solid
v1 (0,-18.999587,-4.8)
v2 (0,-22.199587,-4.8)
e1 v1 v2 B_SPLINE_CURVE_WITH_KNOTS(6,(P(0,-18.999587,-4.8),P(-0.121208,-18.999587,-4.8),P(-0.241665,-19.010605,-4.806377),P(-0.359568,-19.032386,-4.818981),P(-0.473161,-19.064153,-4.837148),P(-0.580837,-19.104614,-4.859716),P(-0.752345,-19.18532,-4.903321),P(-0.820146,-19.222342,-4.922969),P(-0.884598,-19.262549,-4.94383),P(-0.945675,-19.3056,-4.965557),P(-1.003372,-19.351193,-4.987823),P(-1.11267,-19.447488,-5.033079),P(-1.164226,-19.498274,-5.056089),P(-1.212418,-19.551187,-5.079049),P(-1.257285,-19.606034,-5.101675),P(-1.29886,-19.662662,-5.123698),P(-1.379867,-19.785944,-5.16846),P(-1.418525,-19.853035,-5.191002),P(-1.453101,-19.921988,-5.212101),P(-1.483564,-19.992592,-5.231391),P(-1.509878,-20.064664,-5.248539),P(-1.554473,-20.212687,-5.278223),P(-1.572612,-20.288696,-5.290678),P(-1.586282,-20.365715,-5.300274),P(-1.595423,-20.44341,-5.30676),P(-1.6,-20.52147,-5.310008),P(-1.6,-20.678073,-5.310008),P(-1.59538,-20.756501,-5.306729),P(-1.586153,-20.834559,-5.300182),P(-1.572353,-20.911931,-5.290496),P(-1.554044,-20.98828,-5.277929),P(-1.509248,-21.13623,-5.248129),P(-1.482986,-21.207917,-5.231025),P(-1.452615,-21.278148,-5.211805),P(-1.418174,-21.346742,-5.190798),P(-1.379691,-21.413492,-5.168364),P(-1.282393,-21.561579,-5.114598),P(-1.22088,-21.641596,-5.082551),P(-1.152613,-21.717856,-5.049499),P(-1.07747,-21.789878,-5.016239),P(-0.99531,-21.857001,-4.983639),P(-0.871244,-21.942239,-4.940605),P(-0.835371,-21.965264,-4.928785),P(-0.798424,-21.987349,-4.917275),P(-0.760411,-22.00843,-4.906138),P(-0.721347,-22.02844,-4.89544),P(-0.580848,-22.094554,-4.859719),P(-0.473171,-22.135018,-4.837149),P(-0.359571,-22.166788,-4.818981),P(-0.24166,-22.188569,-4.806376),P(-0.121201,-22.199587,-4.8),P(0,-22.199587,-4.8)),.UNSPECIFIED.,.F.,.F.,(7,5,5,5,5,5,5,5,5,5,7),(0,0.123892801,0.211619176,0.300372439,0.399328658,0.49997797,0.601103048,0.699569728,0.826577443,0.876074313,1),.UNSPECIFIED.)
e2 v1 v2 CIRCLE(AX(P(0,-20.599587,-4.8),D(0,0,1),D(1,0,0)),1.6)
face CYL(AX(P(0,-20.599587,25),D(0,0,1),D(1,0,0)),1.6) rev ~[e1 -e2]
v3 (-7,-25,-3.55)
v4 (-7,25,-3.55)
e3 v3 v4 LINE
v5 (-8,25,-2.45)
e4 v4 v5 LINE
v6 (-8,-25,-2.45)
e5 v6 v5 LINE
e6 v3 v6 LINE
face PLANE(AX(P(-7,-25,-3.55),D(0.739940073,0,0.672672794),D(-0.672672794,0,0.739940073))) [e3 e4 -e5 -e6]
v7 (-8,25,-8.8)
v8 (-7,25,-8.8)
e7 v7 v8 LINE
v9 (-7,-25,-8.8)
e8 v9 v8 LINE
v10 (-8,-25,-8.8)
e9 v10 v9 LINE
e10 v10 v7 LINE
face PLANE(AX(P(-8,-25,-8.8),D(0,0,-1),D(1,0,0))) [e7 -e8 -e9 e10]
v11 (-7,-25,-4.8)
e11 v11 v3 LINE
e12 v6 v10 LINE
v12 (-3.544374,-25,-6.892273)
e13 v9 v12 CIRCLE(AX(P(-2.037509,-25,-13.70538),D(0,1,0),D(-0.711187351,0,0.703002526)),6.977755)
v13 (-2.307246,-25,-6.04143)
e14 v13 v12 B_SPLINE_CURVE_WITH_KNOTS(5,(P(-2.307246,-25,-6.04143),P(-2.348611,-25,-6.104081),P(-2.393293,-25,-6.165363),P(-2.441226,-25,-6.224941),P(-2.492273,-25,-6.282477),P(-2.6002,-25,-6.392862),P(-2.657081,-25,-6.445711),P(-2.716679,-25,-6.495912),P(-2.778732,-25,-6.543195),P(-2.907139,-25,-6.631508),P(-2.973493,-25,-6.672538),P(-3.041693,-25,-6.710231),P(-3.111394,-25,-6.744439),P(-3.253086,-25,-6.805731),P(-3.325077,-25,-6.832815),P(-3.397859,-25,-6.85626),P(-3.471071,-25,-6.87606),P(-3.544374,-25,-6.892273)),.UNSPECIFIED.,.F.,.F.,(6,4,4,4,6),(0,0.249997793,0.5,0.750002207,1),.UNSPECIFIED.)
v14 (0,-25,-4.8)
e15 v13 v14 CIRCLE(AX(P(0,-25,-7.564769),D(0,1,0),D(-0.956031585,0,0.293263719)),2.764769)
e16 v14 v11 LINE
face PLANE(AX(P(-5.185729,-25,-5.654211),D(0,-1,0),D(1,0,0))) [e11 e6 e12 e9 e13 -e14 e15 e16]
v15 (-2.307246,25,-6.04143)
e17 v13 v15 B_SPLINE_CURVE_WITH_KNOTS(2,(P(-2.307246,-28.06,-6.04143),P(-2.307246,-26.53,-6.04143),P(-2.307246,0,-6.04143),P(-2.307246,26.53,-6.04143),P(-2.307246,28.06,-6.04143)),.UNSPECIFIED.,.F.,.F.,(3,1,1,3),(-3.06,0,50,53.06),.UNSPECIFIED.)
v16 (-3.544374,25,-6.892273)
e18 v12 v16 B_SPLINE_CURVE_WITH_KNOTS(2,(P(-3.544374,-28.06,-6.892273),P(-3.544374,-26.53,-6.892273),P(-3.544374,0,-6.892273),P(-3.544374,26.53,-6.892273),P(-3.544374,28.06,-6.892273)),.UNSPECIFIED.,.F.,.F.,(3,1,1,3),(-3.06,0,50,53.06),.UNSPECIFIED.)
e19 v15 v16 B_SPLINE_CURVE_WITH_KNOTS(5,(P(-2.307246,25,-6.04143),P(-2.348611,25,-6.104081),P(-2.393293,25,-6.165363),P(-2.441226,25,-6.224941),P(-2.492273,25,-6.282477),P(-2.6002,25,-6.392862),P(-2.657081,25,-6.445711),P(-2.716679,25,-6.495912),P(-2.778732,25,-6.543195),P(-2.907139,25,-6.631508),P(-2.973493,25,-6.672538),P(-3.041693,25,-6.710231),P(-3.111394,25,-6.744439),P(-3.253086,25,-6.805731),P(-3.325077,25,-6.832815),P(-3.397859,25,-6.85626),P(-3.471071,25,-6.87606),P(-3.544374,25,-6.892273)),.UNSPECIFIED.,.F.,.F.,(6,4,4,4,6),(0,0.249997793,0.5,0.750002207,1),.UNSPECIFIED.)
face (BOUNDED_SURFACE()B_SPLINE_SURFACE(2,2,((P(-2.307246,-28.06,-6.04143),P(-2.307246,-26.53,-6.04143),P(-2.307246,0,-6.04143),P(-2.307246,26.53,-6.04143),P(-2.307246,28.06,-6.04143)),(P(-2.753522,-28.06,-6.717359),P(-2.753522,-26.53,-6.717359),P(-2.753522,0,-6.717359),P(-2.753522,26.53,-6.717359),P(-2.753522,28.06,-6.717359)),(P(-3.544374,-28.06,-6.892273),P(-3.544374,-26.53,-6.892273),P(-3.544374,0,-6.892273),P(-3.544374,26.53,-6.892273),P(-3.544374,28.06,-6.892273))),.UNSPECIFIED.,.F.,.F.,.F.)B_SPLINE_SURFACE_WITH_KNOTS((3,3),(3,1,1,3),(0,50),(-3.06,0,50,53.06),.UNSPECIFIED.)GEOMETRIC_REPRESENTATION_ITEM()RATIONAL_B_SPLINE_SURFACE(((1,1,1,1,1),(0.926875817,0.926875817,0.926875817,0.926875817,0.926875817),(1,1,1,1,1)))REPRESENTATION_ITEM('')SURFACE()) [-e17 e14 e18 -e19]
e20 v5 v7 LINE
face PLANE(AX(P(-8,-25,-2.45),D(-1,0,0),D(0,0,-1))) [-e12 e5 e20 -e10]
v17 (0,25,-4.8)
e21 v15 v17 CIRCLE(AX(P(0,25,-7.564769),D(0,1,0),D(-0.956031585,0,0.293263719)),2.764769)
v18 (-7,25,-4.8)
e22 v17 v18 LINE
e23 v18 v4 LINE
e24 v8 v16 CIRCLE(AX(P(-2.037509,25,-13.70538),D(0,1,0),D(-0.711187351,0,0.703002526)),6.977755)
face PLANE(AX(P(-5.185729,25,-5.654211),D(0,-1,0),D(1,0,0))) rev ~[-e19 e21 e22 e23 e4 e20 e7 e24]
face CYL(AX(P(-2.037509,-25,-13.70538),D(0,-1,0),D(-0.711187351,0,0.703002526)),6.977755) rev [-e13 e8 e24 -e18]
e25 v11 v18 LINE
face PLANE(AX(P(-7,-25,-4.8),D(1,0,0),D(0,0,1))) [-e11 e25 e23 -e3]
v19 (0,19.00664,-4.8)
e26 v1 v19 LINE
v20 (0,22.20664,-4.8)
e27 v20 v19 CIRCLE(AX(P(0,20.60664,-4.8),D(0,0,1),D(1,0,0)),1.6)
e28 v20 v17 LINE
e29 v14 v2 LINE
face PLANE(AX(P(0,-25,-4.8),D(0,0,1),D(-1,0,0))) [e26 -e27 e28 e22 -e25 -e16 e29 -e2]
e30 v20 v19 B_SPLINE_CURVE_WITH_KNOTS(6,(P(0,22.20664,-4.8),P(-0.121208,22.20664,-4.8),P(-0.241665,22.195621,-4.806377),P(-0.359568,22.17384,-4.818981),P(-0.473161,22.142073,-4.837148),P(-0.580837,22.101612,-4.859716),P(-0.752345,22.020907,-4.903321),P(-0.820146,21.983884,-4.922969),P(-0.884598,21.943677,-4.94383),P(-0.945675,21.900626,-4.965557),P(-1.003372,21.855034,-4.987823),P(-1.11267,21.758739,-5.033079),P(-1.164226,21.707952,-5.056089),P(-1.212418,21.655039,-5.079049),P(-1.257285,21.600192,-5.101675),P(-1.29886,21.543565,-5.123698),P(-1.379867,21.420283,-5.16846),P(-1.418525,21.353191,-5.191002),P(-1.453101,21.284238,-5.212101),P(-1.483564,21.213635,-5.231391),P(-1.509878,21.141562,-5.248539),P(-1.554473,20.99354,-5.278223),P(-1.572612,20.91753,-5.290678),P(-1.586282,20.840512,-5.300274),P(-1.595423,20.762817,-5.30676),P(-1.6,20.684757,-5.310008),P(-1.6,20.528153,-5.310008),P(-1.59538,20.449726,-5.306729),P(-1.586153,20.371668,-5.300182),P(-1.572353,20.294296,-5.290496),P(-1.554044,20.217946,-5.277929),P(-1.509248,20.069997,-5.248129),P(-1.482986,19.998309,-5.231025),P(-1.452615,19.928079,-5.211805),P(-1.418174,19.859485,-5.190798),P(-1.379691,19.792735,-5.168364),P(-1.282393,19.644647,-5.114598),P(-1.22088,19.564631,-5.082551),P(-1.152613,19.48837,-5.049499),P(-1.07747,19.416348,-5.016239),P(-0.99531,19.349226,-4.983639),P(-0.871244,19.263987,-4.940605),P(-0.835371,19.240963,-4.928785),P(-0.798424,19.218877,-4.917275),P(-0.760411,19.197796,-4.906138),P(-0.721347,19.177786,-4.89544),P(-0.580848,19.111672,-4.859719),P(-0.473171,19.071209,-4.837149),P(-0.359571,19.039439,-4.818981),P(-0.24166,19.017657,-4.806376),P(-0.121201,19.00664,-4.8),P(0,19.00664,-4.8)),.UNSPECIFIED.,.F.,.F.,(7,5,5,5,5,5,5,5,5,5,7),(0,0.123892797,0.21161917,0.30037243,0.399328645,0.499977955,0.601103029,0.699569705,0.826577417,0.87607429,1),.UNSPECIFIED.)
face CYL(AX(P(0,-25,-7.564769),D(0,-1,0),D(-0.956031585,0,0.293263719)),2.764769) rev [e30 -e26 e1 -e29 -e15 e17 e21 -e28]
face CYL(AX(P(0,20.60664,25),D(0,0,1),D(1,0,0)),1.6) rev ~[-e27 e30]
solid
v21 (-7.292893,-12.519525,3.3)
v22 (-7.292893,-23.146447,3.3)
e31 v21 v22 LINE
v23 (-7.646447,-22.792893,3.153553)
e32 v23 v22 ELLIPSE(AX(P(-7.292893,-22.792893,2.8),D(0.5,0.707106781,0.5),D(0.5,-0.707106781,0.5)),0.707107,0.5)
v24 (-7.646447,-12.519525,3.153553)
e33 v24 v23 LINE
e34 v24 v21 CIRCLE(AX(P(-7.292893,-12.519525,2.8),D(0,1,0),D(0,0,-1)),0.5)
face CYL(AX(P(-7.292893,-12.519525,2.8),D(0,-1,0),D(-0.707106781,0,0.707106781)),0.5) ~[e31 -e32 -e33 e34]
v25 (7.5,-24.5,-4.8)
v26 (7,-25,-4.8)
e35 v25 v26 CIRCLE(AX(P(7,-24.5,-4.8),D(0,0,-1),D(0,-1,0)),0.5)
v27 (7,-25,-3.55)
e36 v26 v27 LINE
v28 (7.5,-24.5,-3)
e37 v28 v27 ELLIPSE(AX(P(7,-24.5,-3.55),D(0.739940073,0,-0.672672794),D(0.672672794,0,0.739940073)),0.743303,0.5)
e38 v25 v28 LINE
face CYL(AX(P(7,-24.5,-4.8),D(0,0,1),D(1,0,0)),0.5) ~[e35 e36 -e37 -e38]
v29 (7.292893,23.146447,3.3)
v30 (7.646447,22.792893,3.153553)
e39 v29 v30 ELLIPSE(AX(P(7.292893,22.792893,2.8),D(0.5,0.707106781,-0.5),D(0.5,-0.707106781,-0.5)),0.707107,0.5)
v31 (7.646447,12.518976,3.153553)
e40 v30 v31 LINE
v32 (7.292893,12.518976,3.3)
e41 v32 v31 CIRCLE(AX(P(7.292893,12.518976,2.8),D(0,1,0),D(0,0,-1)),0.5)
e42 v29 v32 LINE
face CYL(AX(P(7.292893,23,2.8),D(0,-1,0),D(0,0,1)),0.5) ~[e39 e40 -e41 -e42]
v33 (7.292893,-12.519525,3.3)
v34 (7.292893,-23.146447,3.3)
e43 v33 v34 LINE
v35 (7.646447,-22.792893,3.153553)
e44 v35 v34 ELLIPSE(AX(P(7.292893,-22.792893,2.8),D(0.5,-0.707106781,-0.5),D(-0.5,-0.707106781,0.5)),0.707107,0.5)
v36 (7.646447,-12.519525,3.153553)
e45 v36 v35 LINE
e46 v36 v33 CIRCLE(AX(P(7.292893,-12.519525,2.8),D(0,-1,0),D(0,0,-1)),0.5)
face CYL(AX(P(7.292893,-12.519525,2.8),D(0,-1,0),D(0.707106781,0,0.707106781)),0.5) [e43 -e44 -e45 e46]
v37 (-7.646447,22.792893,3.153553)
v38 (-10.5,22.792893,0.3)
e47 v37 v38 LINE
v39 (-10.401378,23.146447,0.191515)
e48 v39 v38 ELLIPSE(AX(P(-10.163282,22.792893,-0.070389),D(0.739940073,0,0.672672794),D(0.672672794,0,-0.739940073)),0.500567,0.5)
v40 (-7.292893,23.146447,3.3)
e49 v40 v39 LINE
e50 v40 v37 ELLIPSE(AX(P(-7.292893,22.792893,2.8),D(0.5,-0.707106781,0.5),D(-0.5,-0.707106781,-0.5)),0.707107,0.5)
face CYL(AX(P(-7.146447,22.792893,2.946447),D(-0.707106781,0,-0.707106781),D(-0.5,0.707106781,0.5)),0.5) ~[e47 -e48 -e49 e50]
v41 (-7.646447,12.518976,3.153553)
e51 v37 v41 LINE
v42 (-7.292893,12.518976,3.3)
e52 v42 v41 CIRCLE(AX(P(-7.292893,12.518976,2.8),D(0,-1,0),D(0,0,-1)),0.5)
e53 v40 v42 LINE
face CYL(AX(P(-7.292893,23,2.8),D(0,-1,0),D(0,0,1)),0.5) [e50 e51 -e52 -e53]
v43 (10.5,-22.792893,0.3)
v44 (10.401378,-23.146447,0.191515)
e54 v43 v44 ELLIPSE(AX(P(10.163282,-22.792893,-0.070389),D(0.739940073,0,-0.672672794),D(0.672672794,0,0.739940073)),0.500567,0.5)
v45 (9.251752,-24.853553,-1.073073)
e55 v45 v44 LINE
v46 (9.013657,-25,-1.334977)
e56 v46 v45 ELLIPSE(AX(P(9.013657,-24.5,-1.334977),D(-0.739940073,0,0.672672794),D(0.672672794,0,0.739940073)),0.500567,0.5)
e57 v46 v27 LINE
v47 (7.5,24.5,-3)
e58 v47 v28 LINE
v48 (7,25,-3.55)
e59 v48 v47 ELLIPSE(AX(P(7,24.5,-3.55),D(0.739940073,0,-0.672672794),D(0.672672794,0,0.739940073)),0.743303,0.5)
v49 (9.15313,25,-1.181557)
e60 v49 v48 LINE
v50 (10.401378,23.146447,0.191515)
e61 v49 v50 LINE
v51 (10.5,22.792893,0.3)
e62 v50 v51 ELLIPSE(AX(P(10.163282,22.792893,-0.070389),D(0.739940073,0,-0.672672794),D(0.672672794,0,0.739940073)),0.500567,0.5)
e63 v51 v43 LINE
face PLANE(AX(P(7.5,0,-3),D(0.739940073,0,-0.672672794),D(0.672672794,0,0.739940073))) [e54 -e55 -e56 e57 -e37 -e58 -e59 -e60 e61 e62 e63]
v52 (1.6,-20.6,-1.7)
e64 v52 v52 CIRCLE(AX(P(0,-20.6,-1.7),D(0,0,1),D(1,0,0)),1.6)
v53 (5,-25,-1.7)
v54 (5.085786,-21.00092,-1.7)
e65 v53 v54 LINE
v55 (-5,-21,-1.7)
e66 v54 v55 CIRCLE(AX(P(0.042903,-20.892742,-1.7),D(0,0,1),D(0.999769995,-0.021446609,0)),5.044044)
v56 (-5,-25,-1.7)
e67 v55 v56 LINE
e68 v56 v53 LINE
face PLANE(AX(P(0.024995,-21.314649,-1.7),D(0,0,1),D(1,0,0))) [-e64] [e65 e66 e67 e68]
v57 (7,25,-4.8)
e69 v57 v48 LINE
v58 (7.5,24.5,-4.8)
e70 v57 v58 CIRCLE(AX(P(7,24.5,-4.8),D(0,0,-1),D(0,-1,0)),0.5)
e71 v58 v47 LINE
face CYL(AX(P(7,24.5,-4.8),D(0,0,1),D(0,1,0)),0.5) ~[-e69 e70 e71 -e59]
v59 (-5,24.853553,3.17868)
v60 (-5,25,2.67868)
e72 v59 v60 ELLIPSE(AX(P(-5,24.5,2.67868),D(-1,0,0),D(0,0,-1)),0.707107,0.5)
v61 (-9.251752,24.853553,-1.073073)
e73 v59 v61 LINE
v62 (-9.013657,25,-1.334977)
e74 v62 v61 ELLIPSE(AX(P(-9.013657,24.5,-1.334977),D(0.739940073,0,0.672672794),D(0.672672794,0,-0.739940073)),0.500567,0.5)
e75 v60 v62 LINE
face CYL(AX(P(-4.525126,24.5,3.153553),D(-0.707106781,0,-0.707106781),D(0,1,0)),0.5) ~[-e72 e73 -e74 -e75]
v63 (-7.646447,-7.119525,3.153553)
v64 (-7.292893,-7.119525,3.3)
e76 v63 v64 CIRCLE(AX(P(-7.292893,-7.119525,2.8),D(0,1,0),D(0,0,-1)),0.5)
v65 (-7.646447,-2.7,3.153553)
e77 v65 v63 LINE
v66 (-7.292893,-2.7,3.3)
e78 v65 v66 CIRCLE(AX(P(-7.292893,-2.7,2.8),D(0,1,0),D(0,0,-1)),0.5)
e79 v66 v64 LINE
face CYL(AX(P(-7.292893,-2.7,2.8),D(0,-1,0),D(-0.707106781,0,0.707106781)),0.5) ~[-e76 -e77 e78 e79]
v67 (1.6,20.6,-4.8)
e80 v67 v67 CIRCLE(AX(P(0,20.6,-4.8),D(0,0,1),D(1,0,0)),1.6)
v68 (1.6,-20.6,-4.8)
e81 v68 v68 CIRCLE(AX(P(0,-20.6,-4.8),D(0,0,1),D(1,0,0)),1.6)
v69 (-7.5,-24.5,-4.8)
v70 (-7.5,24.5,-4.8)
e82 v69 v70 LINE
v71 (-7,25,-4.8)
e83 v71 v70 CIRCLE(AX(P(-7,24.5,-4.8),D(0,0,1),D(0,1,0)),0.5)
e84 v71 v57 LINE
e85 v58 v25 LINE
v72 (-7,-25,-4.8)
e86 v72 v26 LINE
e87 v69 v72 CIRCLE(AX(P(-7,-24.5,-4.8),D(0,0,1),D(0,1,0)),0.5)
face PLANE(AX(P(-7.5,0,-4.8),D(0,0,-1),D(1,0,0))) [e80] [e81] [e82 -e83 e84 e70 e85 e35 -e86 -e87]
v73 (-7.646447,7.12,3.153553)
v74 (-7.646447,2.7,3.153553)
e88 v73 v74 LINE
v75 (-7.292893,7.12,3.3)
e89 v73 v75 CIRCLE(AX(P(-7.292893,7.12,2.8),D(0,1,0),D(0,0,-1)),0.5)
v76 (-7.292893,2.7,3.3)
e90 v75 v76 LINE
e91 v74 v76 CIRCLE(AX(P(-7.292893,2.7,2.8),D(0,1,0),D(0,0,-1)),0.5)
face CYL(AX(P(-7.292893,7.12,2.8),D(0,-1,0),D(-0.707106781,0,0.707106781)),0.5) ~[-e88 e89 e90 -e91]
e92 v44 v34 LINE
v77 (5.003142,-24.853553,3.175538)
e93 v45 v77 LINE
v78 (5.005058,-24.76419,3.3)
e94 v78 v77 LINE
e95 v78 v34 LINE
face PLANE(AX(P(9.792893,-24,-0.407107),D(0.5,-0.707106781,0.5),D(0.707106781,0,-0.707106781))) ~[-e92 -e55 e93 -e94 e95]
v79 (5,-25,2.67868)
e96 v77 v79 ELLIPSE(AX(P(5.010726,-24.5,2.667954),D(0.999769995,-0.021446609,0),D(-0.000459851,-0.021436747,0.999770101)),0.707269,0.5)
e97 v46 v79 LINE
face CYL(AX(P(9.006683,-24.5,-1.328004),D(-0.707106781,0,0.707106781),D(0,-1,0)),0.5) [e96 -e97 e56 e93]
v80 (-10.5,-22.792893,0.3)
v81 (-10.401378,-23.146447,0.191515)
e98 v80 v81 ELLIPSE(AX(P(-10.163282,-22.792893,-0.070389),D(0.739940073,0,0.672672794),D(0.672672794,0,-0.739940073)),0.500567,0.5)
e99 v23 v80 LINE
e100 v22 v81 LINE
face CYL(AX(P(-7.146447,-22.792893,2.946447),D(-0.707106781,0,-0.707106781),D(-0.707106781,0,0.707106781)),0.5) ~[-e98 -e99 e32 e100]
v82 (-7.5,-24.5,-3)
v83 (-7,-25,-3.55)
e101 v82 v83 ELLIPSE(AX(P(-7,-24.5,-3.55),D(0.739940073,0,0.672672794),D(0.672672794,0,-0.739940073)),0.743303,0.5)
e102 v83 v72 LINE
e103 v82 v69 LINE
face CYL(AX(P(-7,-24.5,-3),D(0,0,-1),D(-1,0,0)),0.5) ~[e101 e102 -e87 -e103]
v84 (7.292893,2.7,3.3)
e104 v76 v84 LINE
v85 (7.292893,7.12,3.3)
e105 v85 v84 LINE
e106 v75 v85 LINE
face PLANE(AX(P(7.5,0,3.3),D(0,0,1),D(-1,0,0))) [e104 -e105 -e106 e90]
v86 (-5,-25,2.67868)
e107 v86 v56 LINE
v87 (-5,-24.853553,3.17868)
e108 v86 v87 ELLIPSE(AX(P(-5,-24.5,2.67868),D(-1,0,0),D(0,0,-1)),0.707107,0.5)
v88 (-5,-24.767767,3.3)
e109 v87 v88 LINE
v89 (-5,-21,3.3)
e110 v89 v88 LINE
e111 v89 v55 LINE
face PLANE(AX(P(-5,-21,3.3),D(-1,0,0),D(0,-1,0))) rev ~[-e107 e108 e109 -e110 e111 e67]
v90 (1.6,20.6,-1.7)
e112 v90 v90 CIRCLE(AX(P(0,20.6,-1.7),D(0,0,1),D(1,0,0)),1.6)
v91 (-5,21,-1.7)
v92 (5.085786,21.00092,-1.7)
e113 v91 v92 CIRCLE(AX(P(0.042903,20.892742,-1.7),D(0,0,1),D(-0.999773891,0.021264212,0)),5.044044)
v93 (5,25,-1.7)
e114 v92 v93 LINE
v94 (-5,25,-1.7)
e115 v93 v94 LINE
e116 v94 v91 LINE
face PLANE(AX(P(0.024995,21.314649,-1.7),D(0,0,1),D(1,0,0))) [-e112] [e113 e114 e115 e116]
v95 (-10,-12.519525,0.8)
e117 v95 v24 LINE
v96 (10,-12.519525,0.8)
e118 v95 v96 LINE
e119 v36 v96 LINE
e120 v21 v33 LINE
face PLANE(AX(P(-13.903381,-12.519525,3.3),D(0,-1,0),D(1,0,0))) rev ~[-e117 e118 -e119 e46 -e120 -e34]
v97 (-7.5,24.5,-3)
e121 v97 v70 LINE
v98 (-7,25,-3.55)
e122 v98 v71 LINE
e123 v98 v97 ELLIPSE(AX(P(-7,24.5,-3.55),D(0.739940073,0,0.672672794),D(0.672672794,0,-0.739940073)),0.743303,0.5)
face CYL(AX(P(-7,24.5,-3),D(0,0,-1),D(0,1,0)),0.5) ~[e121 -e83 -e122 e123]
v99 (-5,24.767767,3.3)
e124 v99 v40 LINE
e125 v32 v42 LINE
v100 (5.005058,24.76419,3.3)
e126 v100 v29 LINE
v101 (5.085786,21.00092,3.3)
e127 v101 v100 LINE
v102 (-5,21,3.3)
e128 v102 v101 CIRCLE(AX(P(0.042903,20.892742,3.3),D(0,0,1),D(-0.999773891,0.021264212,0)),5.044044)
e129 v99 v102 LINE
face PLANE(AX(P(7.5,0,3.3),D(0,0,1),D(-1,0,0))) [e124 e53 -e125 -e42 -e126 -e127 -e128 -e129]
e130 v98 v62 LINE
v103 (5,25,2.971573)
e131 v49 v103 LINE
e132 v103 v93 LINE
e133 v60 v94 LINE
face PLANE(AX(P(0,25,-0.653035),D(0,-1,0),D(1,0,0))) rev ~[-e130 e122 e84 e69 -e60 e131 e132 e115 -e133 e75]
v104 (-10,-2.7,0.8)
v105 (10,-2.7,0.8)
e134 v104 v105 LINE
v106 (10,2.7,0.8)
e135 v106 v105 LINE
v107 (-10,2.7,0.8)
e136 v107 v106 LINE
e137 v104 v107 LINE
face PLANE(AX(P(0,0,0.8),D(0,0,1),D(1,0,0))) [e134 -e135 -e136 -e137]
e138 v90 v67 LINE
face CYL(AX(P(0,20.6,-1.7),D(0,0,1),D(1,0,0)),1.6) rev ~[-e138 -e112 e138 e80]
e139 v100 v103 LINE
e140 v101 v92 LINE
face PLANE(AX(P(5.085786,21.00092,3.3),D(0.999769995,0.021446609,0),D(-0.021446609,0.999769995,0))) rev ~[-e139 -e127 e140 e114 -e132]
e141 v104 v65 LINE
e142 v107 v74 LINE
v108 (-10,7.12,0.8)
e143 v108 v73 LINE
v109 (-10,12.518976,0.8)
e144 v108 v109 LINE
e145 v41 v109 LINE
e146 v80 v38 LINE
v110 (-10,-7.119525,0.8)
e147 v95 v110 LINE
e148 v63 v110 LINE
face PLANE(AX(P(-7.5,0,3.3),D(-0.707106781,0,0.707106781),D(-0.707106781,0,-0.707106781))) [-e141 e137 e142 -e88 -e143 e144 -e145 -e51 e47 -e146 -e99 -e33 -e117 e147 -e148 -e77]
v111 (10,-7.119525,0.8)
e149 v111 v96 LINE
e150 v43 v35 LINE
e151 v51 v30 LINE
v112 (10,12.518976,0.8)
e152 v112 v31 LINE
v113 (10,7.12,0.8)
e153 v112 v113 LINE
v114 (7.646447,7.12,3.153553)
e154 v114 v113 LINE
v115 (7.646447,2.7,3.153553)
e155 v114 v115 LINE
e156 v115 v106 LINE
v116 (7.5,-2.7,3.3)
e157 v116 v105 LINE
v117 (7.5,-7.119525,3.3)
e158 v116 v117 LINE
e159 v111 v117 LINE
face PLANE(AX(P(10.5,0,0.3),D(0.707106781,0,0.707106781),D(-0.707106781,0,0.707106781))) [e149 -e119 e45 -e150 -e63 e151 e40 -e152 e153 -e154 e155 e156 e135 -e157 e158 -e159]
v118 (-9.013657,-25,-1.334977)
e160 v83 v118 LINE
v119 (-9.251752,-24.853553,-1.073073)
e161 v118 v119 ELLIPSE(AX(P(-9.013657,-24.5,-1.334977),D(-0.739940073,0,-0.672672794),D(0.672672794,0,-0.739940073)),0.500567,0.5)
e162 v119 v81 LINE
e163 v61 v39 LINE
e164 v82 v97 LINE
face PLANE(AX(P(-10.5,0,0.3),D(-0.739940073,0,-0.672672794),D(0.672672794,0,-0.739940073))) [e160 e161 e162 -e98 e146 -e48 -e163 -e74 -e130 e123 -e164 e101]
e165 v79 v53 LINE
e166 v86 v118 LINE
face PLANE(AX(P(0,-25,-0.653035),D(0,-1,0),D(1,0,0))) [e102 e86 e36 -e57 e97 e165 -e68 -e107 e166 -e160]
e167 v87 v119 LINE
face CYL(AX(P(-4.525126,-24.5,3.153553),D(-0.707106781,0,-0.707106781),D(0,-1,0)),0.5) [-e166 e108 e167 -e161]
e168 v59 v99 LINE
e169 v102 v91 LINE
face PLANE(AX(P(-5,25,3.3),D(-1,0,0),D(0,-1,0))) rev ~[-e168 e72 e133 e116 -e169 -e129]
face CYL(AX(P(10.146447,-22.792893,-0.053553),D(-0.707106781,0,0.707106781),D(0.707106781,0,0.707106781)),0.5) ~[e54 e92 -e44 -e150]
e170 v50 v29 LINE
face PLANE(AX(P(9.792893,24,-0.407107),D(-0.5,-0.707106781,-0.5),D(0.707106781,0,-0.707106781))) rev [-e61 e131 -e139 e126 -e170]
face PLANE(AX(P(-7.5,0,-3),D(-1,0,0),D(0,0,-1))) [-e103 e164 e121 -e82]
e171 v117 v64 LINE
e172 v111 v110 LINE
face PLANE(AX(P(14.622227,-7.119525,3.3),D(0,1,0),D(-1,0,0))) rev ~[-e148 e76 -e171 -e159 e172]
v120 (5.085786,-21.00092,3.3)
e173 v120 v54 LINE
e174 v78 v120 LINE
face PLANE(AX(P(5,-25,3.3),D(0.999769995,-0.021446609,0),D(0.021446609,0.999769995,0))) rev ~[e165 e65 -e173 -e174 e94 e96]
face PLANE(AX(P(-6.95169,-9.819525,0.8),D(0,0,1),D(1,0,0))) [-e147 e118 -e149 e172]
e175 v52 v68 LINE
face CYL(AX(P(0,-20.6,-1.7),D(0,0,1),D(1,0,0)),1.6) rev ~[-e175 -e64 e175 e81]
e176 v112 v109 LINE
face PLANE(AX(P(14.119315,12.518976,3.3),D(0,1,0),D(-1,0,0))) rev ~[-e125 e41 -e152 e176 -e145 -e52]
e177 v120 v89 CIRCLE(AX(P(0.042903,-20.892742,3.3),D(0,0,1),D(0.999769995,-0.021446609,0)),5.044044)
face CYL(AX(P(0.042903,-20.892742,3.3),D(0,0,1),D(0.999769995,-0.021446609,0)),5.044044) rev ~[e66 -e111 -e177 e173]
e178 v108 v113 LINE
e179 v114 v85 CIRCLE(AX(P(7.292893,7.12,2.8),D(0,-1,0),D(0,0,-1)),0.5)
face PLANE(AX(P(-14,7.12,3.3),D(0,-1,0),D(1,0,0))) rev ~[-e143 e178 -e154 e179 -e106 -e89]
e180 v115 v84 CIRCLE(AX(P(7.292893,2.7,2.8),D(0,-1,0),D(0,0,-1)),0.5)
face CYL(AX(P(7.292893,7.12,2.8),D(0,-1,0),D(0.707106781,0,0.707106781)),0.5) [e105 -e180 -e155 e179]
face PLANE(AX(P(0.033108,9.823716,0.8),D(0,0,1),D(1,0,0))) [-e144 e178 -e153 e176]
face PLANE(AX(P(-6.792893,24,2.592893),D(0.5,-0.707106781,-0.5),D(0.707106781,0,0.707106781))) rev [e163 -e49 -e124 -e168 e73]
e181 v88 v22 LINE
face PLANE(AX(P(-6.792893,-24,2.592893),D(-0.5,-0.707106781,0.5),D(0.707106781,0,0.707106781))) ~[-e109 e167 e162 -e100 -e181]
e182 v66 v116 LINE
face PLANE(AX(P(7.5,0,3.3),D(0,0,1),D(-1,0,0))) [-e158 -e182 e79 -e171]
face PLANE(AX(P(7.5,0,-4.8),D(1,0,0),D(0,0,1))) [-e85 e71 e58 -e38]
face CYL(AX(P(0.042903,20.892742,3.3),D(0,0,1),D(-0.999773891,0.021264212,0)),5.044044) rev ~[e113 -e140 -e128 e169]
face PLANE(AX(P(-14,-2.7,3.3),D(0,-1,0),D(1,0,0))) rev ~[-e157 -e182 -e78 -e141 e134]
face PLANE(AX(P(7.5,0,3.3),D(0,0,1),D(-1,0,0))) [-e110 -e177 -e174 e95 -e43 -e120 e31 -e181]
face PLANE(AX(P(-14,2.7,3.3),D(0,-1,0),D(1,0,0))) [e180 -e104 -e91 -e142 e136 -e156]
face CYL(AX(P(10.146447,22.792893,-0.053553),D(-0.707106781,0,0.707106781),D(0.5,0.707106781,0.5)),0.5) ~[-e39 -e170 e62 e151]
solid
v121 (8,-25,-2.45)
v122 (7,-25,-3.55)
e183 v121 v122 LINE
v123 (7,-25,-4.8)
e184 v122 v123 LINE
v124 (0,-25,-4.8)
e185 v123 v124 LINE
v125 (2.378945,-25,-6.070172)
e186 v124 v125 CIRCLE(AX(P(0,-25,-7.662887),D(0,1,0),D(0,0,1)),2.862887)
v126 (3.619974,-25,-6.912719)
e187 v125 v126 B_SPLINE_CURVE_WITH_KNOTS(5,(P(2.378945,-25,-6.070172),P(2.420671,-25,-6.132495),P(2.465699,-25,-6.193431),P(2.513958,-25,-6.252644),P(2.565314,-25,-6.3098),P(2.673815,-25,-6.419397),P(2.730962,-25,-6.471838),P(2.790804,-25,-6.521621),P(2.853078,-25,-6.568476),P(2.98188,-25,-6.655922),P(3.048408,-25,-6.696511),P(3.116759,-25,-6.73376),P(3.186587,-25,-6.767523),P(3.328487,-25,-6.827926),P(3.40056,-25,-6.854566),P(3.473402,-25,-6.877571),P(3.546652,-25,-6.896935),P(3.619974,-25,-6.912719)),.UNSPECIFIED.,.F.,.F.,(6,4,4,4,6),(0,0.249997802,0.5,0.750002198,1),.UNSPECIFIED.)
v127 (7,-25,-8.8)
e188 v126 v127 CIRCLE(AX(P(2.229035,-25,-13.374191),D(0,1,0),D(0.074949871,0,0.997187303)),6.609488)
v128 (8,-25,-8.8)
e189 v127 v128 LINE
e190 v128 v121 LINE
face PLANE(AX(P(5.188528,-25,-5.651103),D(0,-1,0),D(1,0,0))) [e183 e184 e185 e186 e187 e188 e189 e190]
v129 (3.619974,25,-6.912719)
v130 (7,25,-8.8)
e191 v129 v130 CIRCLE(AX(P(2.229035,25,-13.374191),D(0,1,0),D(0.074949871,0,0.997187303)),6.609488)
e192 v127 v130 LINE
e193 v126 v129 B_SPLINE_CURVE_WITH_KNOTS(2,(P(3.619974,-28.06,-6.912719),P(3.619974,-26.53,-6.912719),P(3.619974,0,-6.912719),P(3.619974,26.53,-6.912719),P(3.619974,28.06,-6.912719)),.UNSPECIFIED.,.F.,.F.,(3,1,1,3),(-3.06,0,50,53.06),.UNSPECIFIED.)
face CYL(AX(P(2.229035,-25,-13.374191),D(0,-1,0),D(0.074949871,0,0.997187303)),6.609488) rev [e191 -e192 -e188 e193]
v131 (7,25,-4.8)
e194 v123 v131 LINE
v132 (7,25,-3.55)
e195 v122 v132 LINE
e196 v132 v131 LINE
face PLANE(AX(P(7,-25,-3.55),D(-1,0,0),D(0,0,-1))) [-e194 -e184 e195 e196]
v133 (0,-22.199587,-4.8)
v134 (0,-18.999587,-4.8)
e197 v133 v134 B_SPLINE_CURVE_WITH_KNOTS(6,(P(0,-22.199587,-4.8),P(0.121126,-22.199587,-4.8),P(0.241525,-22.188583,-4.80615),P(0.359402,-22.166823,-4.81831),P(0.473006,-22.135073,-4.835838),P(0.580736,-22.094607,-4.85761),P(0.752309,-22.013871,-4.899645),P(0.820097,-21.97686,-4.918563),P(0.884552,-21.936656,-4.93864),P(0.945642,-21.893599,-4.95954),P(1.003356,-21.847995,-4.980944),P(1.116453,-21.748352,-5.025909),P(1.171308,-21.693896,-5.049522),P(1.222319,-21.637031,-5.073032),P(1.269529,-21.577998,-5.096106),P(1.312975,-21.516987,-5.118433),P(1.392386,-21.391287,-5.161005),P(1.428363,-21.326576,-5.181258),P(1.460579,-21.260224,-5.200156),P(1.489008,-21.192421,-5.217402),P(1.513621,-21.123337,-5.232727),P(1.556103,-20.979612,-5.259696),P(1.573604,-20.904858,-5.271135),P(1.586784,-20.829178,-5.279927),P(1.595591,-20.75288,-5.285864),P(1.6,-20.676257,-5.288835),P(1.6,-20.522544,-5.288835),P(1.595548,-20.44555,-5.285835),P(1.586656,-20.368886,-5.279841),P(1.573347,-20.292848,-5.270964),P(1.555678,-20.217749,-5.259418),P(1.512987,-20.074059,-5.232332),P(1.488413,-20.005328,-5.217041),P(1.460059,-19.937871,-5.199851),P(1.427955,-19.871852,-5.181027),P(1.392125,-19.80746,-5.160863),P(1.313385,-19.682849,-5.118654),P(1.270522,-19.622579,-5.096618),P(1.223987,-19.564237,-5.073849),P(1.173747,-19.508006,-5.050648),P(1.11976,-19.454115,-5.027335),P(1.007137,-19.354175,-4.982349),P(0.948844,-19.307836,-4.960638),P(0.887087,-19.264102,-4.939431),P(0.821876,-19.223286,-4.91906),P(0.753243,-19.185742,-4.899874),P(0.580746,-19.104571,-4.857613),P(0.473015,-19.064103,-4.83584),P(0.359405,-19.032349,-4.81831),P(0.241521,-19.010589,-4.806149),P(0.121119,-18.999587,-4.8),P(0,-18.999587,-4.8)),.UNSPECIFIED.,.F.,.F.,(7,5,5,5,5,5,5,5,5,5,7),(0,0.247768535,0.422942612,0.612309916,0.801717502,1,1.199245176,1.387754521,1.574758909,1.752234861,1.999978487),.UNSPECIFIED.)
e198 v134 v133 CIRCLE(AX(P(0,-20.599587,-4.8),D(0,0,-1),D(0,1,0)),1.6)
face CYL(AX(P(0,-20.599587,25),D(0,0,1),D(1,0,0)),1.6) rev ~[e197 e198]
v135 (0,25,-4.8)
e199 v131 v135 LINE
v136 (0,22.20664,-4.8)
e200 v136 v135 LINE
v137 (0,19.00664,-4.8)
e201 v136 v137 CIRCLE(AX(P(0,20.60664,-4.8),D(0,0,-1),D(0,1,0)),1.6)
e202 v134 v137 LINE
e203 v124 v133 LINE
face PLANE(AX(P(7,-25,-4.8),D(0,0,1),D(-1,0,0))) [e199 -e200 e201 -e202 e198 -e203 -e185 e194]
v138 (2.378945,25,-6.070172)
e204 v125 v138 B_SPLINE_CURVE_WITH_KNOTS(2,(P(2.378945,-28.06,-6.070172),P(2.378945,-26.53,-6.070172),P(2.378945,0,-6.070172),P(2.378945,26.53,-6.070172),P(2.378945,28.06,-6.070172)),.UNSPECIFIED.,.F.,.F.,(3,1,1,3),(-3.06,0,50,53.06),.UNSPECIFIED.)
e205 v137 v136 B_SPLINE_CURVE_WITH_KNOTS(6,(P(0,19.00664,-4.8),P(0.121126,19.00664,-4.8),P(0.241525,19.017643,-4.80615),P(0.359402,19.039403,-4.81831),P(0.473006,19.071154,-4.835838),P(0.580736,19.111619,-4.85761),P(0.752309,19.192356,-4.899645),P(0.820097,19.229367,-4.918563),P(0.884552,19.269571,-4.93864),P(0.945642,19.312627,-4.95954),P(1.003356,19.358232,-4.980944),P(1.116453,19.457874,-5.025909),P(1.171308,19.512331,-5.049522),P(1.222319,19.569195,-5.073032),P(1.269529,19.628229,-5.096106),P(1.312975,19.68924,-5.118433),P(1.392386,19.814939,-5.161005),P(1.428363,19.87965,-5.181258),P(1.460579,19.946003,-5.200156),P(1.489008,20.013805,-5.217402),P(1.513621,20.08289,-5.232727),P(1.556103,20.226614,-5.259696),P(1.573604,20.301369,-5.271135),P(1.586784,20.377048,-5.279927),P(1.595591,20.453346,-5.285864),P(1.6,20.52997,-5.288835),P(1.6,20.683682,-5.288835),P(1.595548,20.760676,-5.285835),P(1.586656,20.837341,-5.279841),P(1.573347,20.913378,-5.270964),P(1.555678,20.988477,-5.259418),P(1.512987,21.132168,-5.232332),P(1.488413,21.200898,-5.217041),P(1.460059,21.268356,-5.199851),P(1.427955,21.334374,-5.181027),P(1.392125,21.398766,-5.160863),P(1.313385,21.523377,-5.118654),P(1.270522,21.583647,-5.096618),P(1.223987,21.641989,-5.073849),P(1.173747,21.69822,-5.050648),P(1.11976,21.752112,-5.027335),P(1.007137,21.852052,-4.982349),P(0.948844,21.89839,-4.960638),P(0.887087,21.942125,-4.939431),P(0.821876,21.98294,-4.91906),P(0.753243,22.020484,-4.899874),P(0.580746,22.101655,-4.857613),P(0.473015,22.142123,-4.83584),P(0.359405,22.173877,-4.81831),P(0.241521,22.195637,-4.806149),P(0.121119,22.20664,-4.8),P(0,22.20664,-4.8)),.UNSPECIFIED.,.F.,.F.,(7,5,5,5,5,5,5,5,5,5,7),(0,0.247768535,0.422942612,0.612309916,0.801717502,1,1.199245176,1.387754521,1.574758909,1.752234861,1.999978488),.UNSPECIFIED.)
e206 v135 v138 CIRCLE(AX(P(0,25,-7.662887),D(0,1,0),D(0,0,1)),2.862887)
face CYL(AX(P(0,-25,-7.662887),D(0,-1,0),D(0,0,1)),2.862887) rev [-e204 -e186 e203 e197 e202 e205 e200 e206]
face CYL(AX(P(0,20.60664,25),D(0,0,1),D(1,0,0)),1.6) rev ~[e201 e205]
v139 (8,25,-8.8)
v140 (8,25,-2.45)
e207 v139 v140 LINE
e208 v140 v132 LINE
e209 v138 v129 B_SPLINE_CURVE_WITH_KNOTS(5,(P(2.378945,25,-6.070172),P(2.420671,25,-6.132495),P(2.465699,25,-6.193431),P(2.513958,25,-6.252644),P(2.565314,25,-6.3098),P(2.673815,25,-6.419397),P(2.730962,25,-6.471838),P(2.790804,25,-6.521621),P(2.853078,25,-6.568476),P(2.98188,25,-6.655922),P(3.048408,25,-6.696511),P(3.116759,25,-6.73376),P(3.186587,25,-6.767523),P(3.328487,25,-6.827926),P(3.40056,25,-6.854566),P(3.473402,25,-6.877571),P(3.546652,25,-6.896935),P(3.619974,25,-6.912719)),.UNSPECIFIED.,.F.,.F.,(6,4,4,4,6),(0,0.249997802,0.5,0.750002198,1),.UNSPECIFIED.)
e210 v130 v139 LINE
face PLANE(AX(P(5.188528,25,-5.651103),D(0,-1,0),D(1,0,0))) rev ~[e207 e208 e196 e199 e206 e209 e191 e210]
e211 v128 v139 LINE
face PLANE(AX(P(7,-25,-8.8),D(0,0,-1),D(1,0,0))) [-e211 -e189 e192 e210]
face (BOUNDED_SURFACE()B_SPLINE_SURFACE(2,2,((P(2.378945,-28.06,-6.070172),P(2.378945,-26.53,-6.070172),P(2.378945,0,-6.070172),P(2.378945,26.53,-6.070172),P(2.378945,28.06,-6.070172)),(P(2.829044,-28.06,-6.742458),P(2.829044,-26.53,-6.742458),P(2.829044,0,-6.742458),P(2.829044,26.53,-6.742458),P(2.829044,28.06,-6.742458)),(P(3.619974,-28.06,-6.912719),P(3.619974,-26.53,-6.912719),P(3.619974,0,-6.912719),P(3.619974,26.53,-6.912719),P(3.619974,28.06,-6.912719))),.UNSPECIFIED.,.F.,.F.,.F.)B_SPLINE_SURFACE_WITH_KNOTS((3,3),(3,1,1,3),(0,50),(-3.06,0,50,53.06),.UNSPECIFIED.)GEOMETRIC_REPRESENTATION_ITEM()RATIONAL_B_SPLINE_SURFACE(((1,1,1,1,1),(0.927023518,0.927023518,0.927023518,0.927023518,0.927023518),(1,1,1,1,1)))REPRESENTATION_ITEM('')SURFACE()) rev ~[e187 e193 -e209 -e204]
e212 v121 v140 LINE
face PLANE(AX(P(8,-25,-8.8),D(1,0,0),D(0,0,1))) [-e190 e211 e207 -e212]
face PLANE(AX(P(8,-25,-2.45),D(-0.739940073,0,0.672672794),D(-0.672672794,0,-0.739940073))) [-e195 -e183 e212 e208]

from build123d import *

# Parameters (mm, degrees)
F1_DEPTH  = 25
F2_W      = 28
F2_H      = 5.4
F2_W_2    = 13.9033808853
F2_W_3    = 14.6222274978
F3_DEPTH  = 2.5
F4_SIZE   = 2
F5_R      = 0.5
F8_DEPTH  = 5
F9_R      = 1.6
F10_DEPTH = 3.101
F12_DEPTH = 50
F14_R     = 2
F15_R     = 2
F17_R     = 1.6
F18_DEPTH = 47.90054


# Not quite as in the source:
# - a feature names something its author has since deleted; it is built from what else it names


with BuildPart() as f1:
    # F0 (on Front) → F1 (new body, symmetric)
    with BuildSketch(Plane.XZ):
        Polygon((-7.5, -4.8), (7.5, -4.8), (7.5, -3), (10.5, 0.3), (7.5, 3.3), (-7.5, 3.3), (-10.5, 0.3), (-7.5, -3), align=None)
    extrude(amount=F1_DEPTH, both=True)

    # F2 (on face) → F3 (cut)
    with BuildSketch(Plane.XY.offset(3.3)):
        Rectangle(F2_W, F2_H)
        Polygon((-14.1051735731, 12.5189756917), (-14, 7.12), (14.1193151165, 7.12), (14.1193151165, 12.5189756917), (0, 12.5189756917), align=None)
        with Locations((-6.9516904427, -9.8195246701)):
            Rectangle(F2_W_2, F2_H)
        with Locations((7.3111137489, -9.8195246701)):
            Rectangle(F2_W_3, F2_H)
    extrude(amount=-F3_DEPTH, mode=Mode.SUBTRACT)

    # F4
    f4_edges = [f1.edges().sort_by_distance(p)[0] for p in [
        (9, 25, 1.8),
        (-9, 25, 1.8),
        (9, -25, 1.8),
        (-9, -25, 1.8),
    ]]
    chamfer(f4_edges, length=F4_SIZE)

    # F5
    f5_edges = [f1.edges().sort_by_distance(p)[0] for p in [
        (-7.5, 17.759488, 3.3),
        (-7.5, 4.91, 3.3),
        (-7.5, -4.909762, 3.3),
        (-7.5, -17.759762, 3.3),
        (7.5, -17.759762, 3.3),
        (7.5, 4.91, 3.3),
        (7.5, 17.759488, 3.3),
        (-6.912351, 25, 1.059221),
        (9, 23, 1.8),
        (-9, 23, 1.8),
        (6.912351, -25, 1.059221),
        (9, -23, 1.8),
        (-6.912351, -25, 1.059221),
        (-9, -23, 1.8),
        (-7.5, -25, -3.9),
        (7.5, -25, -3.9),
        (7.5, 25, -3.9),
        (-7.5, 25, -3.9),
    ]]
    fillet(f5_edges, radius=F5_R)

    # F7 (on face) → F8 (cut)
    with BuildSketch(Plane.XY.offset(3.3)):
        with BuildLine():
            Line((-5, -25), (0, -25))
            Line((0, -25), (5, -25))
            Line((5, -25), (5.0857864376, -21.0009200199))
            ThreePointArc((5.0857864376, -21.0009200199), (0.0433631596, -15.8486988611), (-5, -21))
            Line((-5, -21), (-5, -25))
        make_face()
        with BuildLine():
            ThreePointArc((-5, 21), (0.0433631596, 15.8486988611), (5.0857864376, 21.0009200199))
            Line((5.0857864376, 21.0009200199), (5, 25))
            Line((5, 25), (-5, 25))
            Line((-5, 25), (-5, 21))
        make_face()
    extrude(amount=-F8_DEPTH, mode=Mode.SUBTRACT)

    # F9 (on face) → F10 (cut, through all)
    with BuildSketch(Plane.XY.offset(-1.7)):
        with Locations((0, -20.6)):
            Circle(F9_R)
        with Locations((0, 20.6)):
            Circle(F9_R)
    extrude(amount=-F10_DEPTH, mode=Mode.SUBTRACT)


with BuildPart() as f12:
    # F11 (on face) → F12 (new body)
    with BuildSketch(Plane.XZ.offset(25)):
        with BuildLine():
            ThreePointArc((-2.6432063896, -6.753962487), (-1.6435106798, -5.3415235892), (0, -4.8))
            Line((0, -4.8), (-2.5, -4.8))
            Line((-2.5, -4.8), (-7, -4.8))
            Line((-7, -4.8), (-7, -3.55))
            Line((-7, -3.55), (-8, -2.45))
            Line((-8, -2.45), (-8, -8.8))
            Line((-8, -8.8), (-7, -8.8))
            ThreePointArc((-7, -8.8), (-5.0036087462, -7.3894220622), (-2.6432063896, -6.753962487))
        make_face()
    extrude(amount=-F12_DEPTH)

    # F14
    f14_edges = [f12.edges().sort_by_distance(p)[0] for p in [
        (-2.643206, 0, -6.753962),
    ]]
    fillet(f14_edges, radius=F14_R)


with BuildPart() as f12b:
    # F11 (on face) → F12, piece 2 (new body)
    with BuildSketch(Plane.XZ.offset(25)):
        with BuildLine():
            Line((2.5, -4.8), (0, -4.8))
            ThreePointArc((0, -4.8), (1.6849251685, -5.3483353555), (2.724415157, -6.7832935601))
            ThreePointArc((2.724415157, -6.7832935601), (5.048675757, -7.396318783), (7, -8.8))
            Line((7, -8.8), (8, -8.8))
            Line((8, -8.8), (8, -2.45))
            Line((8, -2.45), (7, -3.55))
            Line((7, -3.55), (7, -4.8))
            Line((7, -4.8), (2.5, -4.8))
        make_face()
    extrude(amount=-F12_DEPTH)

    # F15
    f15_edges = [f12b.edges().sort_by_distance(p)[0] for p in [
        (2.724415, 0, -6.783294),
    ]]
    fillet(f15_edges, radius=F15_R)


with BuildPart() as f18_tool:
    # F17 (on offset) → F18 (new body)
    with BuildSketch(Plane.XY.offset(25)):
        with Locations((0, 20.606639777)):
            Circle(F17_R)
        with Locations((0, -20.5995866995)):
            Circle(F17_R)
    extrude(amount=-F18_DEPTH)


with BuildPart() as f12_1:
    add(f12.part)

    # F18: cut by f18_tool
    add(f18_tool.part, mode=Mode.SUBTRACT)


with BuildPart() as f12b_1:
    add(f12b.part)

    # F18: cut by f18_tool
    add(f18_tool.part, mode=Mode.SUBTRACT)


solid = Compound([f1.part, f12_1.part, f12b_1.part])
